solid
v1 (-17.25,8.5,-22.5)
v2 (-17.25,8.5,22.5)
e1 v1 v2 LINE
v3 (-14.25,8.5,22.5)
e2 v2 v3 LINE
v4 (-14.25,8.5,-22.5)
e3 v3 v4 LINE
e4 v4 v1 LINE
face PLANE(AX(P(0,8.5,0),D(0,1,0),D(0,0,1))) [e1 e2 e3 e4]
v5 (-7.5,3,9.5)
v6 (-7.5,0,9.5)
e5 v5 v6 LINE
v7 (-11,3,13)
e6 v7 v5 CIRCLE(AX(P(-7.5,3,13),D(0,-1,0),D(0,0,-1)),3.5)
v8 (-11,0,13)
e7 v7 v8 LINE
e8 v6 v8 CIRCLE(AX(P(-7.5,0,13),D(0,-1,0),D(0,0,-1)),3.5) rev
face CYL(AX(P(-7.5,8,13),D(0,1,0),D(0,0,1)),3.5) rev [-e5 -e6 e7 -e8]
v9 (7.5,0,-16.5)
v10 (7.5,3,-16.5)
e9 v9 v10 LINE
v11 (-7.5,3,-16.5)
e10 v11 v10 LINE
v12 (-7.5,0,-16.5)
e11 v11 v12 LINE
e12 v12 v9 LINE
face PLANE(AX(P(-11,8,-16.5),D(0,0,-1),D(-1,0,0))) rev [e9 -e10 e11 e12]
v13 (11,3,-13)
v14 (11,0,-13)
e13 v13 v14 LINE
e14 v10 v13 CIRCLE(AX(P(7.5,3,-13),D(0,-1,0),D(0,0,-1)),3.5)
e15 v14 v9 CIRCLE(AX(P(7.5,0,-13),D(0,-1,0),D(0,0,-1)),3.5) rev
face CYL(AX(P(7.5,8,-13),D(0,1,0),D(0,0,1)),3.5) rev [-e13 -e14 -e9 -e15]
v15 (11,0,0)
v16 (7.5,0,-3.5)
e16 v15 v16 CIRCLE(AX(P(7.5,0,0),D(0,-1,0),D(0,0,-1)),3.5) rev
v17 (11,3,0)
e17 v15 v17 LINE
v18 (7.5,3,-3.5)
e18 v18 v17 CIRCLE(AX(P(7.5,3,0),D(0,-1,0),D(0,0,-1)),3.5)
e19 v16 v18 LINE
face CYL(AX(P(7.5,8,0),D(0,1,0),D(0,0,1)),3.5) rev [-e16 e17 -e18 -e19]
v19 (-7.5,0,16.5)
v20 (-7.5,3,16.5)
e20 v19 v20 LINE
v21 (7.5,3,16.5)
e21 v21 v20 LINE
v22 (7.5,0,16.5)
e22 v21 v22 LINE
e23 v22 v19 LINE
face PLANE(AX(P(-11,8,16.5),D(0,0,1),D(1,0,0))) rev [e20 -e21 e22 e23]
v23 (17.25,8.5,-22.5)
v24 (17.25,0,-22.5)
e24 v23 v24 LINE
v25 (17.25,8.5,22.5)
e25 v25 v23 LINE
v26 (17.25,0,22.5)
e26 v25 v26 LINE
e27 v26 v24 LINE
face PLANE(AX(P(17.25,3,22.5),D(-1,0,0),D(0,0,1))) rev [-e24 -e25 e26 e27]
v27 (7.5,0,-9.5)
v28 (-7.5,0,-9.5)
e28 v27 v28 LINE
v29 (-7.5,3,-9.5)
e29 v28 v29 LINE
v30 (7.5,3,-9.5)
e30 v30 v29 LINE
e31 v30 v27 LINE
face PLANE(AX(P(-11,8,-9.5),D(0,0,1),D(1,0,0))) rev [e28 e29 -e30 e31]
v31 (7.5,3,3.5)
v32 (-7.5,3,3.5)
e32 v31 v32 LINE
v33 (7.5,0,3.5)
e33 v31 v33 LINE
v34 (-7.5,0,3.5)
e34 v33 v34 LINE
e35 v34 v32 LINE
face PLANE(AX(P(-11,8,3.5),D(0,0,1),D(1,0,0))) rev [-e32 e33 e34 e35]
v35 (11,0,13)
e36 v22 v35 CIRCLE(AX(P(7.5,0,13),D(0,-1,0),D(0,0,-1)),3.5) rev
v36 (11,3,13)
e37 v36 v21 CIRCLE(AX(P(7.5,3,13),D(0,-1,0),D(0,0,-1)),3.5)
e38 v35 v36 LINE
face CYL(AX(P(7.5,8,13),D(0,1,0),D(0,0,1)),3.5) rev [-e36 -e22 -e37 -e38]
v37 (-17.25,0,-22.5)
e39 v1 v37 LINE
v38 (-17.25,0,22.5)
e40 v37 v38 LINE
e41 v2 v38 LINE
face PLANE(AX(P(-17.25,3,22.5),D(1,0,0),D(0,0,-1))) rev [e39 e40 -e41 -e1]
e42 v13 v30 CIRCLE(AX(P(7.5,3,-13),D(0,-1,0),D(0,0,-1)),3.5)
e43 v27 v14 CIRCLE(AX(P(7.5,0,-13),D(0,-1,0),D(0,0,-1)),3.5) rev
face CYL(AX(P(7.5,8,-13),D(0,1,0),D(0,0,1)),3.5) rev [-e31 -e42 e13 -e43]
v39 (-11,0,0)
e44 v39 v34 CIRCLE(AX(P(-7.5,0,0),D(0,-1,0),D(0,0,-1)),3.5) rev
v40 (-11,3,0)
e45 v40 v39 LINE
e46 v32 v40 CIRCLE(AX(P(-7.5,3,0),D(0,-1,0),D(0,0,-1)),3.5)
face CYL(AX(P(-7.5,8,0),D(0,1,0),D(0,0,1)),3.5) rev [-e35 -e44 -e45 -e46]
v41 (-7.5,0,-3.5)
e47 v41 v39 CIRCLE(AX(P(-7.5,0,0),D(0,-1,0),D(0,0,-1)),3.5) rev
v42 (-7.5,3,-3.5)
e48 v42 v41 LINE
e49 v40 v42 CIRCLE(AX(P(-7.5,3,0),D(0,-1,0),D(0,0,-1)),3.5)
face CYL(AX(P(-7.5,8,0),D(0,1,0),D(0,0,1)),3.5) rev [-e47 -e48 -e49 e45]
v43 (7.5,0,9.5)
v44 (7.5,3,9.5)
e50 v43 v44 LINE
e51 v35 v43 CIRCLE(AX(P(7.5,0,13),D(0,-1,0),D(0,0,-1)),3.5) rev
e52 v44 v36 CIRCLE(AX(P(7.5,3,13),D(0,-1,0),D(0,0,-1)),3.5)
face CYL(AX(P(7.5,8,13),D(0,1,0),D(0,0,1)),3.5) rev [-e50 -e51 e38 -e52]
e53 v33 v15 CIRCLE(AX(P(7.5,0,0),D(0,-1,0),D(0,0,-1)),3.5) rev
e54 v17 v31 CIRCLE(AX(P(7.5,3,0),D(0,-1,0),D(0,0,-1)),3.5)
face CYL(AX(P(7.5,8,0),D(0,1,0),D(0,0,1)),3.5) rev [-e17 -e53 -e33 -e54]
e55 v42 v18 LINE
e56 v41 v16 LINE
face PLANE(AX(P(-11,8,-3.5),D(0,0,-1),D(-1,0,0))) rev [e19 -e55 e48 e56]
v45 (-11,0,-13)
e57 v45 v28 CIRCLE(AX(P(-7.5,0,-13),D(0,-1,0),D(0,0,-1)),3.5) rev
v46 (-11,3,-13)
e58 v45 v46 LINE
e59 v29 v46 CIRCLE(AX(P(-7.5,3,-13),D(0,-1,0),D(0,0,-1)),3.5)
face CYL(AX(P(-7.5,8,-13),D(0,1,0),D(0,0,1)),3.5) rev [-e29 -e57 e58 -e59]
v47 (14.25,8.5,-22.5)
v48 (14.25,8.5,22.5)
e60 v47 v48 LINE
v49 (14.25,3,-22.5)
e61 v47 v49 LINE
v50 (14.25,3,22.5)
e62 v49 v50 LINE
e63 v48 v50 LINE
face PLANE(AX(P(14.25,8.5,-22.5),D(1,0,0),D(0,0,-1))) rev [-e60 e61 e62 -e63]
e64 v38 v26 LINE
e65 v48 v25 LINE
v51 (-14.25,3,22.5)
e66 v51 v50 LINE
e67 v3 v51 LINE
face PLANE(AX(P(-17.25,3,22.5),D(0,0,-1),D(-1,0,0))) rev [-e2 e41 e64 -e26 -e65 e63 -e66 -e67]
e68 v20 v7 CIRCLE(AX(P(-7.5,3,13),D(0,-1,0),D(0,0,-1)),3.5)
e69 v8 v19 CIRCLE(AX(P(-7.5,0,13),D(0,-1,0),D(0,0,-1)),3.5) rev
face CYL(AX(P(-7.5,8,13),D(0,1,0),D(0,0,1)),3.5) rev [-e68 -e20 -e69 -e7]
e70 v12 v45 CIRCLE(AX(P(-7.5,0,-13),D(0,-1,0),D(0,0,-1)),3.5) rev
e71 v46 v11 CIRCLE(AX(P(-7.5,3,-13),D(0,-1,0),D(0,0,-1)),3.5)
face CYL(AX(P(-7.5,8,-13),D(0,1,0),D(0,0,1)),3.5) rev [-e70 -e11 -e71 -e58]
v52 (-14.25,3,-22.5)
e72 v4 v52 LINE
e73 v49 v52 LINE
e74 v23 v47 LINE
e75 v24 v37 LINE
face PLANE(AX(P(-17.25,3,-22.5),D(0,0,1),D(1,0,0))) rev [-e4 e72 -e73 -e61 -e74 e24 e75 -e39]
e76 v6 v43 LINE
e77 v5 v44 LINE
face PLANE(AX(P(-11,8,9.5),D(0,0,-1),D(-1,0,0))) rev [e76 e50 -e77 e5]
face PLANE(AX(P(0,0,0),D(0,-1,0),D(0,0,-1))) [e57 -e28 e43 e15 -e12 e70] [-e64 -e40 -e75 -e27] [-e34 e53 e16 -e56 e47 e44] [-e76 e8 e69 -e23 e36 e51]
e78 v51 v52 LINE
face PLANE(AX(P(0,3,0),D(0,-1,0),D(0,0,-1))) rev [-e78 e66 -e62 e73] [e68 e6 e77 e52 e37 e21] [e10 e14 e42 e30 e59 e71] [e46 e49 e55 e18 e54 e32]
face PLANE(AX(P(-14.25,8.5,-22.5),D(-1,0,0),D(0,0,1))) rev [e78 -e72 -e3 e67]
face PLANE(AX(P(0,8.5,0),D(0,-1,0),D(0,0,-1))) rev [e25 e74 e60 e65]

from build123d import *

# Parameters (mm, degrees)
SKETCH2_W           = 34.5
SKETCH2_H           = 45
BOSS_EXTRUDE1_DEPTH = 3
SKETCH3_W           = 3
SKETCH3_H           = 45
BOSS_EXTRUDE2_DEPTH = 5.5
SKETCH4_W           = 22
SKETCH4_H           = 7
CUT_EXTRUDE1_DEPTH  = 8
FILLET1_R           = 3.5


with BuildPart() as part:
    # Sketch2 → Boss-Extrude1 (new body)
    with BuildSketch(Plane(origin=(0, 0, 0), x_dir=(1, 0, 0), z_dir=(0, 1, 0))):
        Rectangle(SKETCH2_W, SKETCH2_H)
    extrude(amount=BOSS_EXTRUDE1_DEPTH)

    # Sketch3 → Boss-Extrude2 (add)
    with BuildSketch(Plane(origin=(0, 3, 0), x_dir=(1, 0, 0), z_dir=(0, 1, 0))):
        with Locations((-15.75, 0)):
            Rectangle(SKETCH3_W, SKETCH3_H)
        with Locations((15.75, 0)):
            Rectangle(SKETCH3_W, SKETCH3_H)
    extrude(amount=BOSS_EXTRUDE2_DEPTH)

    # Sketch4 → Cut-Extrude1 (cut)
    with BuildSketch(Plane.XZ):
        with Locations((0, 13)):
            Rectangle(SKETCH4_W, SKETCH4_H)
        Rectangle(SKETCH4_W, SKETCH4_H)
        with Locations((0, -13)):
            Rectangle(SKETCH4_W, SKETCH4_H)
    extrude(amount=-CUT_EXTRUDE1_DEPTH, mode=Mode.SUBTRACT)

    # Fillet1
    fillet1_edges = [part.edges().sort_by_distance(p)[0] for p in [
        (-11, 1.5, -9.5),
        (-11, 1.5, -16.5),
        (11, 1.5, -9.5),
        (11, 1.5, -16.5),
        (11, 1.5, -3.5),
        (-11, 1.5, -3.5),
        (-11, 1.5, 3.5),
        (11, 1.5, 3.5),
        (11, 1.5, 9.5),
        (11, 1.5, 16.5),
        (-11, 1.5, 9.5),
        (-11, 1.5, 16.5),
    ]]
    fillet(fillet1_edges, radius=FILLET1_R - 0.0001)  # a hair under: the kernel refuses the full size


solid = part.part
